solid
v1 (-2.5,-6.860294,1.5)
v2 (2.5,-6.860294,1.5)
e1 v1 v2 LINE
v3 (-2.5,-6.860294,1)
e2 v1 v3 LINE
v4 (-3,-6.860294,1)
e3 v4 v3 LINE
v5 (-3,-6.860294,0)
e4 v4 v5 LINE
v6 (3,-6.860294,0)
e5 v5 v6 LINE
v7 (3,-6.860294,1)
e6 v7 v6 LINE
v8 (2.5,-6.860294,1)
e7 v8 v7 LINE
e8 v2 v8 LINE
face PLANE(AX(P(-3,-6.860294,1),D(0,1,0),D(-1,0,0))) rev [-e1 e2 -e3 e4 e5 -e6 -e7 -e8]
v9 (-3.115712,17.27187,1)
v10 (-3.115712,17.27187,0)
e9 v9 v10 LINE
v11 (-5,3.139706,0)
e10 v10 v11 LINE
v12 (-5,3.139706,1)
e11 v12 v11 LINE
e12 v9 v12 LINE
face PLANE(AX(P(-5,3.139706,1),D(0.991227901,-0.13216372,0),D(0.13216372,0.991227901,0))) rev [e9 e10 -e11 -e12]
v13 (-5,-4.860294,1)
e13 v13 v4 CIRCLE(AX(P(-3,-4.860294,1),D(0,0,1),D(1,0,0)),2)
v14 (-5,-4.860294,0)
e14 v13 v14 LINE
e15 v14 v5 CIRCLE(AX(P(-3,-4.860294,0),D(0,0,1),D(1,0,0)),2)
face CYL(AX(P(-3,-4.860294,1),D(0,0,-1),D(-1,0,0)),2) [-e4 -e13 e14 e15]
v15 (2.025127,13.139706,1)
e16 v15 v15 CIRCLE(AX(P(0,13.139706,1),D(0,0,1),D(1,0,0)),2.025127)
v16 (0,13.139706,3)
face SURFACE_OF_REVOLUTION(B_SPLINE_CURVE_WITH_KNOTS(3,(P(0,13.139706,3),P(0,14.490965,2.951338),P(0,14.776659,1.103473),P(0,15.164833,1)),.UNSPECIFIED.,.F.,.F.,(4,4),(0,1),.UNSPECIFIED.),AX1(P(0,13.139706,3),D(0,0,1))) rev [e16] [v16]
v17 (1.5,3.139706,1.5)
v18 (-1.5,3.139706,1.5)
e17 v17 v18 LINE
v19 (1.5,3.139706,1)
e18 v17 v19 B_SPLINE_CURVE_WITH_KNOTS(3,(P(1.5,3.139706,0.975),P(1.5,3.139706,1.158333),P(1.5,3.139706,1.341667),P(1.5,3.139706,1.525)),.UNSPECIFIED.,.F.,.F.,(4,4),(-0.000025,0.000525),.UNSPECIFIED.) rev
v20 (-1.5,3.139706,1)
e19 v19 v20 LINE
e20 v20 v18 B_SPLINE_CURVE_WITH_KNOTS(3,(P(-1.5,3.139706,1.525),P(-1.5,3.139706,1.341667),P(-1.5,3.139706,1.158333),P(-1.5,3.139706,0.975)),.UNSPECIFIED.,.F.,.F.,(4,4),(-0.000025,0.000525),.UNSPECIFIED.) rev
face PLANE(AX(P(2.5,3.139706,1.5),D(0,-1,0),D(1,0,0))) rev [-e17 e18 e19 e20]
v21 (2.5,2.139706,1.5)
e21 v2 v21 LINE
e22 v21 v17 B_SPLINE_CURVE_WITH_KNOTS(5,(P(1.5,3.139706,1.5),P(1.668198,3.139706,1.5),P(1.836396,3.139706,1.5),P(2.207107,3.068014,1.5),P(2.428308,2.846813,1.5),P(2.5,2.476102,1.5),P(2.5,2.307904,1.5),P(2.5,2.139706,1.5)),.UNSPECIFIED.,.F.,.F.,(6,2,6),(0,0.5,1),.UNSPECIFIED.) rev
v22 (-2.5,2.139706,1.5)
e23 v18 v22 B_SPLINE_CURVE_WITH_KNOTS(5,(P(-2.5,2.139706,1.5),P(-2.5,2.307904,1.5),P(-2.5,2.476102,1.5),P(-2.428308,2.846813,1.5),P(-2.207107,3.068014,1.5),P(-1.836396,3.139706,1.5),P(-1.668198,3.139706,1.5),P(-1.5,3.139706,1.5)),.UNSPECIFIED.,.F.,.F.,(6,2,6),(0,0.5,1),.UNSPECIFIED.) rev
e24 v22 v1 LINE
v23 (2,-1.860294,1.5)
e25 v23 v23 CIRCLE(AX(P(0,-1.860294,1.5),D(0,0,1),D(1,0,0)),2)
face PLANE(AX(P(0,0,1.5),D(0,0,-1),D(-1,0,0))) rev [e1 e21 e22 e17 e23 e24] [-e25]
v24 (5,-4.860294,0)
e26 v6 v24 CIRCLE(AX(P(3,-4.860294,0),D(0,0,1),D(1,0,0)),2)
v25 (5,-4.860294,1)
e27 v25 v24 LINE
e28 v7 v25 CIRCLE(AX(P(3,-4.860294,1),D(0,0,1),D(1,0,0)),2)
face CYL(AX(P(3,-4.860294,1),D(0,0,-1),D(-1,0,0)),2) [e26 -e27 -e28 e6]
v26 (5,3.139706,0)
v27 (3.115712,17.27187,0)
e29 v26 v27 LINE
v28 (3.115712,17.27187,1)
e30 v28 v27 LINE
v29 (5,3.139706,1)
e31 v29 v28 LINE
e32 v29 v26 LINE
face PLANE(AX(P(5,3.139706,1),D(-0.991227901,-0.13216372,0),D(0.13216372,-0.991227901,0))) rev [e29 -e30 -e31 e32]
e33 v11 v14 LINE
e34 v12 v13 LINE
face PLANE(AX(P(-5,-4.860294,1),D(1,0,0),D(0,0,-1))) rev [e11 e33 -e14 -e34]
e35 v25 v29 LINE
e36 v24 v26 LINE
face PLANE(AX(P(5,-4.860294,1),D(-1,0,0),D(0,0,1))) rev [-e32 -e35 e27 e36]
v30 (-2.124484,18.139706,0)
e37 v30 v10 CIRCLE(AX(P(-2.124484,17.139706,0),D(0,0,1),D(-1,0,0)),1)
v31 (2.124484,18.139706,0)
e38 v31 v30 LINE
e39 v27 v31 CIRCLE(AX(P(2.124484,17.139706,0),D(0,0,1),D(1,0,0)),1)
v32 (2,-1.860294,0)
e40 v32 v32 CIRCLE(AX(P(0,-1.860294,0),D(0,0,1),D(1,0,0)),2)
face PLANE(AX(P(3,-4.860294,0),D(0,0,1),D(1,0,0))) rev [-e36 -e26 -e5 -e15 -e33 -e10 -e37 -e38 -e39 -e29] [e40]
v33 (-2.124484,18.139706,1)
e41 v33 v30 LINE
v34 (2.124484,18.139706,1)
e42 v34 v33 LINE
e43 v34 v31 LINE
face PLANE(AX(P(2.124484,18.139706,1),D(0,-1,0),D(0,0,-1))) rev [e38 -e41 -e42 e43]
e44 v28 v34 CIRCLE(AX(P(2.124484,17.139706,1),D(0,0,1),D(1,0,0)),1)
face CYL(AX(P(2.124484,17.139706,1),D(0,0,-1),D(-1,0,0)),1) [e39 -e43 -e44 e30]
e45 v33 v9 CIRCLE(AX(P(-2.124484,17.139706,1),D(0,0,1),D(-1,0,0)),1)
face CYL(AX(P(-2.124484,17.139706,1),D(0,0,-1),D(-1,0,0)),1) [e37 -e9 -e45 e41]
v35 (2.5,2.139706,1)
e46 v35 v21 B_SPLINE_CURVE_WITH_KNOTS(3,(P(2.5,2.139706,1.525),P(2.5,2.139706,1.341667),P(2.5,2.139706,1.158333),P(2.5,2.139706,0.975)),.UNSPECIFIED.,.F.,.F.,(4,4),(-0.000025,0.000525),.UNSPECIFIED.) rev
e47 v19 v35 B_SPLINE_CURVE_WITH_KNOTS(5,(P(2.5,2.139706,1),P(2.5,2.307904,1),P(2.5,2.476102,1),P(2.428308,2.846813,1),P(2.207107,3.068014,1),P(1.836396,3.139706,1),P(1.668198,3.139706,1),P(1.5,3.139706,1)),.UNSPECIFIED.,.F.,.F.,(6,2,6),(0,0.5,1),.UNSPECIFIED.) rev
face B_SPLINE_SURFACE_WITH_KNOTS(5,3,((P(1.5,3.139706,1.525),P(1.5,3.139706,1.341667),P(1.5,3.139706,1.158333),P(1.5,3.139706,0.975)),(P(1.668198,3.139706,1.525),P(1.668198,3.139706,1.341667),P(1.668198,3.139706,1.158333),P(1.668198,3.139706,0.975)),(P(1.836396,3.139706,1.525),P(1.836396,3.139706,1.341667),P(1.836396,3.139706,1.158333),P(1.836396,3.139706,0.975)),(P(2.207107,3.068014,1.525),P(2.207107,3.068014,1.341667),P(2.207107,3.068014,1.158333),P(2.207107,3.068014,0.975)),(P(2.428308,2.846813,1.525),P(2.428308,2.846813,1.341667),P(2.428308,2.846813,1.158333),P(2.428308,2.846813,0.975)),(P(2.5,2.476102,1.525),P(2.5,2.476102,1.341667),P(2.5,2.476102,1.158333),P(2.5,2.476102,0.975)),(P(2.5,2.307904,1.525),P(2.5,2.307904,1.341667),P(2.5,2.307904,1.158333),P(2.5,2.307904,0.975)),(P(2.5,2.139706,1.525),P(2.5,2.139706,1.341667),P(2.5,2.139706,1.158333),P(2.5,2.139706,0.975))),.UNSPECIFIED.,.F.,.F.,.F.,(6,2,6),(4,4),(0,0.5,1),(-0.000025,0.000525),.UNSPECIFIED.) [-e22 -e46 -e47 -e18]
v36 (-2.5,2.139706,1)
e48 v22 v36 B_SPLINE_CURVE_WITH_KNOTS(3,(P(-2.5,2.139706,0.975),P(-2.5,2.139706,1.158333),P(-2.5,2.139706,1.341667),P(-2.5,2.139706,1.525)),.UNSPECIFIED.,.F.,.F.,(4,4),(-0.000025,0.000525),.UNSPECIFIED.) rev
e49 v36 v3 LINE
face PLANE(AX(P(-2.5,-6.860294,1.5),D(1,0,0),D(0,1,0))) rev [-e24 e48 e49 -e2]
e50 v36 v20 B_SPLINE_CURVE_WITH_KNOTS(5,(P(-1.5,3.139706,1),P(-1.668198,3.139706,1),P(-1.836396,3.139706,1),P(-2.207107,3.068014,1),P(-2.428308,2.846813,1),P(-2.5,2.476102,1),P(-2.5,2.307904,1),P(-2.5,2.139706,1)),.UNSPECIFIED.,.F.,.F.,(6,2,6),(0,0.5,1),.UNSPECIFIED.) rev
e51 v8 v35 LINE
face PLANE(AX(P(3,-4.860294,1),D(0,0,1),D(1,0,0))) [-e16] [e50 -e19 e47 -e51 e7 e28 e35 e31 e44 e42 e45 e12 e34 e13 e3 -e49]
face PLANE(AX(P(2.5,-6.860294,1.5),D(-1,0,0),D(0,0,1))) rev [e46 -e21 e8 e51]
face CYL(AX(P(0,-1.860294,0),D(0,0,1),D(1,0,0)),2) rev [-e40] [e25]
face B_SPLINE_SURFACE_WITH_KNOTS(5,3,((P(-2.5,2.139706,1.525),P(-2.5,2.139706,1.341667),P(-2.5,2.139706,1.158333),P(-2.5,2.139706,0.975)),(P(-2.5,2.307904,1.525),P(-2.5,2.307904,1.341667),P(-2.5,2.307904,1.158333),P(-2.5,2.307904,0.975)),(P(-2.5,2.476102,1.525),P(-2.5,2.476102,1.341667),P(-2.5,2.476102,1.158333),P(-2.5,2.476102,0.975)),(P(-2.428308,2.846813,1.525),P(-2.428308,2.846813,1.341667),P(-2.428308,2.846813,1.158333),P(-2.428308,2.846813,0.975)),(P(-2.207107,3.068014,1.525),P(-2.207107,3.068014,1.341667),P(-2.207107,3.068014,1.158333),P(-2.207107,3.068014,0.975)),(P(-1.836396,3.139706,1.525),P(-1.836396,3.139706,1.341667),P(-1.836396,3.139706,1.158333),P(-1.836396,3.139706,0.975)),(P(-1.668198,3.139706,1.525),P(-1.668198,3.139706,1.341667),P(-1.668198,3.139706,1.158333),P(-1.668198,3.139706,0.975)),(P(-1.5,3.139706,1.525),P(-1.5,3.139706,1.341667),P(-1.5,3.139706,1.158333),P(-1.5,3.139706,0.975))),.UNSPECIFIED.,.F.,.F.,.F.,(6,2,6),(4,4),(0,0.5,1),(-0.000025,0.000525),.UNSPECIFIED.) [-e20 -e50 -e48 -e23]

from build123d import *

# Parameters (mm, degrees)
BOSS_EXTRUDE1_DEPTH     = 1
SKETCH4_W               = 5
SKETCH4_H               = 10
BOSS_EXTRUDE2_DEPTH     = 0.5
CUT_EXTRUDE2_DEPTH      = 19.842742091
CUT_EXTRUDE2_DEPTH_BACK = 19.842742091
SKETCH3_R               = 2
FILLET1_SIZE            = 1


with BuildPart() as part:
    # Sketch1 → Boss-Extrude1 (new body)
    with BuildSketch(Plane.XY):
        with BuildLine():
            Line((-3, -6.860294118), (3, -6.860294118))
            ThreePointArc((3, -6.860294118), (4.414213562, -6.27450768), (5, -4.860294118))
            Line((5, -4.860294118), (5, 3.139705882))
            Line((5, 3.139705882), (3.115711504, 17.271869602))
            ThreePointArc((3.115711504, 17.271869602), (2.783208235, 17.89209), (2.124483603, 18.139705882))
            Line((2.124483603, 18.139705882), (-2.124483603, 18.139705882))
            ThreePointArc((-2.124483603, 18.139705882), (-2.783208235, 17.89209), (-3.115711504, 17.271869602))
            Line((-3.115711504, 17.271869602), (-5, 3.139705882))
            Line((-5, 3.139705882), (-5, -4.860294118))
            ThreePointArc((-5, -4.860294118), (-4.414213562, -6.27450768), (-3, -6.860294118))
        make_face()
    extrude(amount=BOSS_EXTRUDE1_DEPTH)

    # Sketch4 → Boss-Extrude2 (add)
    with BuildSketch(Plane.XY.offset(1)):
        with Locations((0, -1.860294118)):
            Rectangle(SKETCH4_W, SKETCH4_H)
    extrude(amount=BOSS_EXTRUDE2_DEPTH)

    # Sketch3 → Cut-Extrude2 (cut, two sides: drawn at the far end of the back side and taken through both)
    with BuildSketch(Plane.XY.offset(1).offset(-CUT_EXTRUDE2_DEPTH_BACK)):
        with Locations((0, -1.860294118)):
            Circle(SKETCH3_R)
    extrude(amount=CUT_EXTRUDE2_DEPTH + CUT_EXTRUDE2_DEPTH_BACK, mode=Mode.SUBTRACT)

    # Sketch10 → Revolve1 (revolve)
    with BuildSketch(Plane.ZY):
        with BuildLine():
            Line((3, 13.139705882), (1, 13.139705882))
            Line((1, 13.139705882), (1, 15.164832594))
            add(Edge.make_bspline(
                [(1, 15.164832594), (1.103472507, 14.776659397), (2.95133834, 14.490964633), (3, 13.139705882)],
                knots=[0, 0, 0, 0, 1, 1, 1, 1], degree=3))
        make_face()
    revolve(axis=Axis((0, 13.139705882, 3), (0, 0, -1)))

    # Fillet1
    # a fillet whose section is not a circle: 1 mm, written as the material it takes off along each edge
    with BuildSketch(Plane(origin=(2.5, 3.139705882, 1), x_dir=(-1, 0, 0), z_dir=(0, 0, 1)), Plane(origin=(-2.5, 3.139705882, 1), x_dir=(0, -1, 0), z_dir=(0, 0, 1))) as fillet1_piece_1:
        with BuildLine():
            add(Edge.make_bspline([(FILLET1_SIZE, 0), (FILLET1_SIZE * 0.831801948466, 0), (FILLET1_SIZE * 0.663603896932, 0), (FILLET1_SIZE * 0.292893218813, FILLET1_SIZE * 0.0716919198361), (FILLET1_SIZE * 0.0716919198361, FILLET1_SIZE * 0.292893218813), (0, FILLET1_SIZE * 0.663603896932), (0, FILLET1_SIZE * 0.831801948466), (0, FILLET1_SIZE)], knots=[0, 0, 0, 0, 0, 0, 0.5, 0.5, 1, 1, 1, 1, 1, 1], degree=5))
            Line((0, FILLET1_SIZE), (0, 0))
            Line((0, 0), (FILLET1_SIZE, 0))
        make_face()
    extrude(amount=3, mode=Mode.SUBTRACT)


solid = part.part
